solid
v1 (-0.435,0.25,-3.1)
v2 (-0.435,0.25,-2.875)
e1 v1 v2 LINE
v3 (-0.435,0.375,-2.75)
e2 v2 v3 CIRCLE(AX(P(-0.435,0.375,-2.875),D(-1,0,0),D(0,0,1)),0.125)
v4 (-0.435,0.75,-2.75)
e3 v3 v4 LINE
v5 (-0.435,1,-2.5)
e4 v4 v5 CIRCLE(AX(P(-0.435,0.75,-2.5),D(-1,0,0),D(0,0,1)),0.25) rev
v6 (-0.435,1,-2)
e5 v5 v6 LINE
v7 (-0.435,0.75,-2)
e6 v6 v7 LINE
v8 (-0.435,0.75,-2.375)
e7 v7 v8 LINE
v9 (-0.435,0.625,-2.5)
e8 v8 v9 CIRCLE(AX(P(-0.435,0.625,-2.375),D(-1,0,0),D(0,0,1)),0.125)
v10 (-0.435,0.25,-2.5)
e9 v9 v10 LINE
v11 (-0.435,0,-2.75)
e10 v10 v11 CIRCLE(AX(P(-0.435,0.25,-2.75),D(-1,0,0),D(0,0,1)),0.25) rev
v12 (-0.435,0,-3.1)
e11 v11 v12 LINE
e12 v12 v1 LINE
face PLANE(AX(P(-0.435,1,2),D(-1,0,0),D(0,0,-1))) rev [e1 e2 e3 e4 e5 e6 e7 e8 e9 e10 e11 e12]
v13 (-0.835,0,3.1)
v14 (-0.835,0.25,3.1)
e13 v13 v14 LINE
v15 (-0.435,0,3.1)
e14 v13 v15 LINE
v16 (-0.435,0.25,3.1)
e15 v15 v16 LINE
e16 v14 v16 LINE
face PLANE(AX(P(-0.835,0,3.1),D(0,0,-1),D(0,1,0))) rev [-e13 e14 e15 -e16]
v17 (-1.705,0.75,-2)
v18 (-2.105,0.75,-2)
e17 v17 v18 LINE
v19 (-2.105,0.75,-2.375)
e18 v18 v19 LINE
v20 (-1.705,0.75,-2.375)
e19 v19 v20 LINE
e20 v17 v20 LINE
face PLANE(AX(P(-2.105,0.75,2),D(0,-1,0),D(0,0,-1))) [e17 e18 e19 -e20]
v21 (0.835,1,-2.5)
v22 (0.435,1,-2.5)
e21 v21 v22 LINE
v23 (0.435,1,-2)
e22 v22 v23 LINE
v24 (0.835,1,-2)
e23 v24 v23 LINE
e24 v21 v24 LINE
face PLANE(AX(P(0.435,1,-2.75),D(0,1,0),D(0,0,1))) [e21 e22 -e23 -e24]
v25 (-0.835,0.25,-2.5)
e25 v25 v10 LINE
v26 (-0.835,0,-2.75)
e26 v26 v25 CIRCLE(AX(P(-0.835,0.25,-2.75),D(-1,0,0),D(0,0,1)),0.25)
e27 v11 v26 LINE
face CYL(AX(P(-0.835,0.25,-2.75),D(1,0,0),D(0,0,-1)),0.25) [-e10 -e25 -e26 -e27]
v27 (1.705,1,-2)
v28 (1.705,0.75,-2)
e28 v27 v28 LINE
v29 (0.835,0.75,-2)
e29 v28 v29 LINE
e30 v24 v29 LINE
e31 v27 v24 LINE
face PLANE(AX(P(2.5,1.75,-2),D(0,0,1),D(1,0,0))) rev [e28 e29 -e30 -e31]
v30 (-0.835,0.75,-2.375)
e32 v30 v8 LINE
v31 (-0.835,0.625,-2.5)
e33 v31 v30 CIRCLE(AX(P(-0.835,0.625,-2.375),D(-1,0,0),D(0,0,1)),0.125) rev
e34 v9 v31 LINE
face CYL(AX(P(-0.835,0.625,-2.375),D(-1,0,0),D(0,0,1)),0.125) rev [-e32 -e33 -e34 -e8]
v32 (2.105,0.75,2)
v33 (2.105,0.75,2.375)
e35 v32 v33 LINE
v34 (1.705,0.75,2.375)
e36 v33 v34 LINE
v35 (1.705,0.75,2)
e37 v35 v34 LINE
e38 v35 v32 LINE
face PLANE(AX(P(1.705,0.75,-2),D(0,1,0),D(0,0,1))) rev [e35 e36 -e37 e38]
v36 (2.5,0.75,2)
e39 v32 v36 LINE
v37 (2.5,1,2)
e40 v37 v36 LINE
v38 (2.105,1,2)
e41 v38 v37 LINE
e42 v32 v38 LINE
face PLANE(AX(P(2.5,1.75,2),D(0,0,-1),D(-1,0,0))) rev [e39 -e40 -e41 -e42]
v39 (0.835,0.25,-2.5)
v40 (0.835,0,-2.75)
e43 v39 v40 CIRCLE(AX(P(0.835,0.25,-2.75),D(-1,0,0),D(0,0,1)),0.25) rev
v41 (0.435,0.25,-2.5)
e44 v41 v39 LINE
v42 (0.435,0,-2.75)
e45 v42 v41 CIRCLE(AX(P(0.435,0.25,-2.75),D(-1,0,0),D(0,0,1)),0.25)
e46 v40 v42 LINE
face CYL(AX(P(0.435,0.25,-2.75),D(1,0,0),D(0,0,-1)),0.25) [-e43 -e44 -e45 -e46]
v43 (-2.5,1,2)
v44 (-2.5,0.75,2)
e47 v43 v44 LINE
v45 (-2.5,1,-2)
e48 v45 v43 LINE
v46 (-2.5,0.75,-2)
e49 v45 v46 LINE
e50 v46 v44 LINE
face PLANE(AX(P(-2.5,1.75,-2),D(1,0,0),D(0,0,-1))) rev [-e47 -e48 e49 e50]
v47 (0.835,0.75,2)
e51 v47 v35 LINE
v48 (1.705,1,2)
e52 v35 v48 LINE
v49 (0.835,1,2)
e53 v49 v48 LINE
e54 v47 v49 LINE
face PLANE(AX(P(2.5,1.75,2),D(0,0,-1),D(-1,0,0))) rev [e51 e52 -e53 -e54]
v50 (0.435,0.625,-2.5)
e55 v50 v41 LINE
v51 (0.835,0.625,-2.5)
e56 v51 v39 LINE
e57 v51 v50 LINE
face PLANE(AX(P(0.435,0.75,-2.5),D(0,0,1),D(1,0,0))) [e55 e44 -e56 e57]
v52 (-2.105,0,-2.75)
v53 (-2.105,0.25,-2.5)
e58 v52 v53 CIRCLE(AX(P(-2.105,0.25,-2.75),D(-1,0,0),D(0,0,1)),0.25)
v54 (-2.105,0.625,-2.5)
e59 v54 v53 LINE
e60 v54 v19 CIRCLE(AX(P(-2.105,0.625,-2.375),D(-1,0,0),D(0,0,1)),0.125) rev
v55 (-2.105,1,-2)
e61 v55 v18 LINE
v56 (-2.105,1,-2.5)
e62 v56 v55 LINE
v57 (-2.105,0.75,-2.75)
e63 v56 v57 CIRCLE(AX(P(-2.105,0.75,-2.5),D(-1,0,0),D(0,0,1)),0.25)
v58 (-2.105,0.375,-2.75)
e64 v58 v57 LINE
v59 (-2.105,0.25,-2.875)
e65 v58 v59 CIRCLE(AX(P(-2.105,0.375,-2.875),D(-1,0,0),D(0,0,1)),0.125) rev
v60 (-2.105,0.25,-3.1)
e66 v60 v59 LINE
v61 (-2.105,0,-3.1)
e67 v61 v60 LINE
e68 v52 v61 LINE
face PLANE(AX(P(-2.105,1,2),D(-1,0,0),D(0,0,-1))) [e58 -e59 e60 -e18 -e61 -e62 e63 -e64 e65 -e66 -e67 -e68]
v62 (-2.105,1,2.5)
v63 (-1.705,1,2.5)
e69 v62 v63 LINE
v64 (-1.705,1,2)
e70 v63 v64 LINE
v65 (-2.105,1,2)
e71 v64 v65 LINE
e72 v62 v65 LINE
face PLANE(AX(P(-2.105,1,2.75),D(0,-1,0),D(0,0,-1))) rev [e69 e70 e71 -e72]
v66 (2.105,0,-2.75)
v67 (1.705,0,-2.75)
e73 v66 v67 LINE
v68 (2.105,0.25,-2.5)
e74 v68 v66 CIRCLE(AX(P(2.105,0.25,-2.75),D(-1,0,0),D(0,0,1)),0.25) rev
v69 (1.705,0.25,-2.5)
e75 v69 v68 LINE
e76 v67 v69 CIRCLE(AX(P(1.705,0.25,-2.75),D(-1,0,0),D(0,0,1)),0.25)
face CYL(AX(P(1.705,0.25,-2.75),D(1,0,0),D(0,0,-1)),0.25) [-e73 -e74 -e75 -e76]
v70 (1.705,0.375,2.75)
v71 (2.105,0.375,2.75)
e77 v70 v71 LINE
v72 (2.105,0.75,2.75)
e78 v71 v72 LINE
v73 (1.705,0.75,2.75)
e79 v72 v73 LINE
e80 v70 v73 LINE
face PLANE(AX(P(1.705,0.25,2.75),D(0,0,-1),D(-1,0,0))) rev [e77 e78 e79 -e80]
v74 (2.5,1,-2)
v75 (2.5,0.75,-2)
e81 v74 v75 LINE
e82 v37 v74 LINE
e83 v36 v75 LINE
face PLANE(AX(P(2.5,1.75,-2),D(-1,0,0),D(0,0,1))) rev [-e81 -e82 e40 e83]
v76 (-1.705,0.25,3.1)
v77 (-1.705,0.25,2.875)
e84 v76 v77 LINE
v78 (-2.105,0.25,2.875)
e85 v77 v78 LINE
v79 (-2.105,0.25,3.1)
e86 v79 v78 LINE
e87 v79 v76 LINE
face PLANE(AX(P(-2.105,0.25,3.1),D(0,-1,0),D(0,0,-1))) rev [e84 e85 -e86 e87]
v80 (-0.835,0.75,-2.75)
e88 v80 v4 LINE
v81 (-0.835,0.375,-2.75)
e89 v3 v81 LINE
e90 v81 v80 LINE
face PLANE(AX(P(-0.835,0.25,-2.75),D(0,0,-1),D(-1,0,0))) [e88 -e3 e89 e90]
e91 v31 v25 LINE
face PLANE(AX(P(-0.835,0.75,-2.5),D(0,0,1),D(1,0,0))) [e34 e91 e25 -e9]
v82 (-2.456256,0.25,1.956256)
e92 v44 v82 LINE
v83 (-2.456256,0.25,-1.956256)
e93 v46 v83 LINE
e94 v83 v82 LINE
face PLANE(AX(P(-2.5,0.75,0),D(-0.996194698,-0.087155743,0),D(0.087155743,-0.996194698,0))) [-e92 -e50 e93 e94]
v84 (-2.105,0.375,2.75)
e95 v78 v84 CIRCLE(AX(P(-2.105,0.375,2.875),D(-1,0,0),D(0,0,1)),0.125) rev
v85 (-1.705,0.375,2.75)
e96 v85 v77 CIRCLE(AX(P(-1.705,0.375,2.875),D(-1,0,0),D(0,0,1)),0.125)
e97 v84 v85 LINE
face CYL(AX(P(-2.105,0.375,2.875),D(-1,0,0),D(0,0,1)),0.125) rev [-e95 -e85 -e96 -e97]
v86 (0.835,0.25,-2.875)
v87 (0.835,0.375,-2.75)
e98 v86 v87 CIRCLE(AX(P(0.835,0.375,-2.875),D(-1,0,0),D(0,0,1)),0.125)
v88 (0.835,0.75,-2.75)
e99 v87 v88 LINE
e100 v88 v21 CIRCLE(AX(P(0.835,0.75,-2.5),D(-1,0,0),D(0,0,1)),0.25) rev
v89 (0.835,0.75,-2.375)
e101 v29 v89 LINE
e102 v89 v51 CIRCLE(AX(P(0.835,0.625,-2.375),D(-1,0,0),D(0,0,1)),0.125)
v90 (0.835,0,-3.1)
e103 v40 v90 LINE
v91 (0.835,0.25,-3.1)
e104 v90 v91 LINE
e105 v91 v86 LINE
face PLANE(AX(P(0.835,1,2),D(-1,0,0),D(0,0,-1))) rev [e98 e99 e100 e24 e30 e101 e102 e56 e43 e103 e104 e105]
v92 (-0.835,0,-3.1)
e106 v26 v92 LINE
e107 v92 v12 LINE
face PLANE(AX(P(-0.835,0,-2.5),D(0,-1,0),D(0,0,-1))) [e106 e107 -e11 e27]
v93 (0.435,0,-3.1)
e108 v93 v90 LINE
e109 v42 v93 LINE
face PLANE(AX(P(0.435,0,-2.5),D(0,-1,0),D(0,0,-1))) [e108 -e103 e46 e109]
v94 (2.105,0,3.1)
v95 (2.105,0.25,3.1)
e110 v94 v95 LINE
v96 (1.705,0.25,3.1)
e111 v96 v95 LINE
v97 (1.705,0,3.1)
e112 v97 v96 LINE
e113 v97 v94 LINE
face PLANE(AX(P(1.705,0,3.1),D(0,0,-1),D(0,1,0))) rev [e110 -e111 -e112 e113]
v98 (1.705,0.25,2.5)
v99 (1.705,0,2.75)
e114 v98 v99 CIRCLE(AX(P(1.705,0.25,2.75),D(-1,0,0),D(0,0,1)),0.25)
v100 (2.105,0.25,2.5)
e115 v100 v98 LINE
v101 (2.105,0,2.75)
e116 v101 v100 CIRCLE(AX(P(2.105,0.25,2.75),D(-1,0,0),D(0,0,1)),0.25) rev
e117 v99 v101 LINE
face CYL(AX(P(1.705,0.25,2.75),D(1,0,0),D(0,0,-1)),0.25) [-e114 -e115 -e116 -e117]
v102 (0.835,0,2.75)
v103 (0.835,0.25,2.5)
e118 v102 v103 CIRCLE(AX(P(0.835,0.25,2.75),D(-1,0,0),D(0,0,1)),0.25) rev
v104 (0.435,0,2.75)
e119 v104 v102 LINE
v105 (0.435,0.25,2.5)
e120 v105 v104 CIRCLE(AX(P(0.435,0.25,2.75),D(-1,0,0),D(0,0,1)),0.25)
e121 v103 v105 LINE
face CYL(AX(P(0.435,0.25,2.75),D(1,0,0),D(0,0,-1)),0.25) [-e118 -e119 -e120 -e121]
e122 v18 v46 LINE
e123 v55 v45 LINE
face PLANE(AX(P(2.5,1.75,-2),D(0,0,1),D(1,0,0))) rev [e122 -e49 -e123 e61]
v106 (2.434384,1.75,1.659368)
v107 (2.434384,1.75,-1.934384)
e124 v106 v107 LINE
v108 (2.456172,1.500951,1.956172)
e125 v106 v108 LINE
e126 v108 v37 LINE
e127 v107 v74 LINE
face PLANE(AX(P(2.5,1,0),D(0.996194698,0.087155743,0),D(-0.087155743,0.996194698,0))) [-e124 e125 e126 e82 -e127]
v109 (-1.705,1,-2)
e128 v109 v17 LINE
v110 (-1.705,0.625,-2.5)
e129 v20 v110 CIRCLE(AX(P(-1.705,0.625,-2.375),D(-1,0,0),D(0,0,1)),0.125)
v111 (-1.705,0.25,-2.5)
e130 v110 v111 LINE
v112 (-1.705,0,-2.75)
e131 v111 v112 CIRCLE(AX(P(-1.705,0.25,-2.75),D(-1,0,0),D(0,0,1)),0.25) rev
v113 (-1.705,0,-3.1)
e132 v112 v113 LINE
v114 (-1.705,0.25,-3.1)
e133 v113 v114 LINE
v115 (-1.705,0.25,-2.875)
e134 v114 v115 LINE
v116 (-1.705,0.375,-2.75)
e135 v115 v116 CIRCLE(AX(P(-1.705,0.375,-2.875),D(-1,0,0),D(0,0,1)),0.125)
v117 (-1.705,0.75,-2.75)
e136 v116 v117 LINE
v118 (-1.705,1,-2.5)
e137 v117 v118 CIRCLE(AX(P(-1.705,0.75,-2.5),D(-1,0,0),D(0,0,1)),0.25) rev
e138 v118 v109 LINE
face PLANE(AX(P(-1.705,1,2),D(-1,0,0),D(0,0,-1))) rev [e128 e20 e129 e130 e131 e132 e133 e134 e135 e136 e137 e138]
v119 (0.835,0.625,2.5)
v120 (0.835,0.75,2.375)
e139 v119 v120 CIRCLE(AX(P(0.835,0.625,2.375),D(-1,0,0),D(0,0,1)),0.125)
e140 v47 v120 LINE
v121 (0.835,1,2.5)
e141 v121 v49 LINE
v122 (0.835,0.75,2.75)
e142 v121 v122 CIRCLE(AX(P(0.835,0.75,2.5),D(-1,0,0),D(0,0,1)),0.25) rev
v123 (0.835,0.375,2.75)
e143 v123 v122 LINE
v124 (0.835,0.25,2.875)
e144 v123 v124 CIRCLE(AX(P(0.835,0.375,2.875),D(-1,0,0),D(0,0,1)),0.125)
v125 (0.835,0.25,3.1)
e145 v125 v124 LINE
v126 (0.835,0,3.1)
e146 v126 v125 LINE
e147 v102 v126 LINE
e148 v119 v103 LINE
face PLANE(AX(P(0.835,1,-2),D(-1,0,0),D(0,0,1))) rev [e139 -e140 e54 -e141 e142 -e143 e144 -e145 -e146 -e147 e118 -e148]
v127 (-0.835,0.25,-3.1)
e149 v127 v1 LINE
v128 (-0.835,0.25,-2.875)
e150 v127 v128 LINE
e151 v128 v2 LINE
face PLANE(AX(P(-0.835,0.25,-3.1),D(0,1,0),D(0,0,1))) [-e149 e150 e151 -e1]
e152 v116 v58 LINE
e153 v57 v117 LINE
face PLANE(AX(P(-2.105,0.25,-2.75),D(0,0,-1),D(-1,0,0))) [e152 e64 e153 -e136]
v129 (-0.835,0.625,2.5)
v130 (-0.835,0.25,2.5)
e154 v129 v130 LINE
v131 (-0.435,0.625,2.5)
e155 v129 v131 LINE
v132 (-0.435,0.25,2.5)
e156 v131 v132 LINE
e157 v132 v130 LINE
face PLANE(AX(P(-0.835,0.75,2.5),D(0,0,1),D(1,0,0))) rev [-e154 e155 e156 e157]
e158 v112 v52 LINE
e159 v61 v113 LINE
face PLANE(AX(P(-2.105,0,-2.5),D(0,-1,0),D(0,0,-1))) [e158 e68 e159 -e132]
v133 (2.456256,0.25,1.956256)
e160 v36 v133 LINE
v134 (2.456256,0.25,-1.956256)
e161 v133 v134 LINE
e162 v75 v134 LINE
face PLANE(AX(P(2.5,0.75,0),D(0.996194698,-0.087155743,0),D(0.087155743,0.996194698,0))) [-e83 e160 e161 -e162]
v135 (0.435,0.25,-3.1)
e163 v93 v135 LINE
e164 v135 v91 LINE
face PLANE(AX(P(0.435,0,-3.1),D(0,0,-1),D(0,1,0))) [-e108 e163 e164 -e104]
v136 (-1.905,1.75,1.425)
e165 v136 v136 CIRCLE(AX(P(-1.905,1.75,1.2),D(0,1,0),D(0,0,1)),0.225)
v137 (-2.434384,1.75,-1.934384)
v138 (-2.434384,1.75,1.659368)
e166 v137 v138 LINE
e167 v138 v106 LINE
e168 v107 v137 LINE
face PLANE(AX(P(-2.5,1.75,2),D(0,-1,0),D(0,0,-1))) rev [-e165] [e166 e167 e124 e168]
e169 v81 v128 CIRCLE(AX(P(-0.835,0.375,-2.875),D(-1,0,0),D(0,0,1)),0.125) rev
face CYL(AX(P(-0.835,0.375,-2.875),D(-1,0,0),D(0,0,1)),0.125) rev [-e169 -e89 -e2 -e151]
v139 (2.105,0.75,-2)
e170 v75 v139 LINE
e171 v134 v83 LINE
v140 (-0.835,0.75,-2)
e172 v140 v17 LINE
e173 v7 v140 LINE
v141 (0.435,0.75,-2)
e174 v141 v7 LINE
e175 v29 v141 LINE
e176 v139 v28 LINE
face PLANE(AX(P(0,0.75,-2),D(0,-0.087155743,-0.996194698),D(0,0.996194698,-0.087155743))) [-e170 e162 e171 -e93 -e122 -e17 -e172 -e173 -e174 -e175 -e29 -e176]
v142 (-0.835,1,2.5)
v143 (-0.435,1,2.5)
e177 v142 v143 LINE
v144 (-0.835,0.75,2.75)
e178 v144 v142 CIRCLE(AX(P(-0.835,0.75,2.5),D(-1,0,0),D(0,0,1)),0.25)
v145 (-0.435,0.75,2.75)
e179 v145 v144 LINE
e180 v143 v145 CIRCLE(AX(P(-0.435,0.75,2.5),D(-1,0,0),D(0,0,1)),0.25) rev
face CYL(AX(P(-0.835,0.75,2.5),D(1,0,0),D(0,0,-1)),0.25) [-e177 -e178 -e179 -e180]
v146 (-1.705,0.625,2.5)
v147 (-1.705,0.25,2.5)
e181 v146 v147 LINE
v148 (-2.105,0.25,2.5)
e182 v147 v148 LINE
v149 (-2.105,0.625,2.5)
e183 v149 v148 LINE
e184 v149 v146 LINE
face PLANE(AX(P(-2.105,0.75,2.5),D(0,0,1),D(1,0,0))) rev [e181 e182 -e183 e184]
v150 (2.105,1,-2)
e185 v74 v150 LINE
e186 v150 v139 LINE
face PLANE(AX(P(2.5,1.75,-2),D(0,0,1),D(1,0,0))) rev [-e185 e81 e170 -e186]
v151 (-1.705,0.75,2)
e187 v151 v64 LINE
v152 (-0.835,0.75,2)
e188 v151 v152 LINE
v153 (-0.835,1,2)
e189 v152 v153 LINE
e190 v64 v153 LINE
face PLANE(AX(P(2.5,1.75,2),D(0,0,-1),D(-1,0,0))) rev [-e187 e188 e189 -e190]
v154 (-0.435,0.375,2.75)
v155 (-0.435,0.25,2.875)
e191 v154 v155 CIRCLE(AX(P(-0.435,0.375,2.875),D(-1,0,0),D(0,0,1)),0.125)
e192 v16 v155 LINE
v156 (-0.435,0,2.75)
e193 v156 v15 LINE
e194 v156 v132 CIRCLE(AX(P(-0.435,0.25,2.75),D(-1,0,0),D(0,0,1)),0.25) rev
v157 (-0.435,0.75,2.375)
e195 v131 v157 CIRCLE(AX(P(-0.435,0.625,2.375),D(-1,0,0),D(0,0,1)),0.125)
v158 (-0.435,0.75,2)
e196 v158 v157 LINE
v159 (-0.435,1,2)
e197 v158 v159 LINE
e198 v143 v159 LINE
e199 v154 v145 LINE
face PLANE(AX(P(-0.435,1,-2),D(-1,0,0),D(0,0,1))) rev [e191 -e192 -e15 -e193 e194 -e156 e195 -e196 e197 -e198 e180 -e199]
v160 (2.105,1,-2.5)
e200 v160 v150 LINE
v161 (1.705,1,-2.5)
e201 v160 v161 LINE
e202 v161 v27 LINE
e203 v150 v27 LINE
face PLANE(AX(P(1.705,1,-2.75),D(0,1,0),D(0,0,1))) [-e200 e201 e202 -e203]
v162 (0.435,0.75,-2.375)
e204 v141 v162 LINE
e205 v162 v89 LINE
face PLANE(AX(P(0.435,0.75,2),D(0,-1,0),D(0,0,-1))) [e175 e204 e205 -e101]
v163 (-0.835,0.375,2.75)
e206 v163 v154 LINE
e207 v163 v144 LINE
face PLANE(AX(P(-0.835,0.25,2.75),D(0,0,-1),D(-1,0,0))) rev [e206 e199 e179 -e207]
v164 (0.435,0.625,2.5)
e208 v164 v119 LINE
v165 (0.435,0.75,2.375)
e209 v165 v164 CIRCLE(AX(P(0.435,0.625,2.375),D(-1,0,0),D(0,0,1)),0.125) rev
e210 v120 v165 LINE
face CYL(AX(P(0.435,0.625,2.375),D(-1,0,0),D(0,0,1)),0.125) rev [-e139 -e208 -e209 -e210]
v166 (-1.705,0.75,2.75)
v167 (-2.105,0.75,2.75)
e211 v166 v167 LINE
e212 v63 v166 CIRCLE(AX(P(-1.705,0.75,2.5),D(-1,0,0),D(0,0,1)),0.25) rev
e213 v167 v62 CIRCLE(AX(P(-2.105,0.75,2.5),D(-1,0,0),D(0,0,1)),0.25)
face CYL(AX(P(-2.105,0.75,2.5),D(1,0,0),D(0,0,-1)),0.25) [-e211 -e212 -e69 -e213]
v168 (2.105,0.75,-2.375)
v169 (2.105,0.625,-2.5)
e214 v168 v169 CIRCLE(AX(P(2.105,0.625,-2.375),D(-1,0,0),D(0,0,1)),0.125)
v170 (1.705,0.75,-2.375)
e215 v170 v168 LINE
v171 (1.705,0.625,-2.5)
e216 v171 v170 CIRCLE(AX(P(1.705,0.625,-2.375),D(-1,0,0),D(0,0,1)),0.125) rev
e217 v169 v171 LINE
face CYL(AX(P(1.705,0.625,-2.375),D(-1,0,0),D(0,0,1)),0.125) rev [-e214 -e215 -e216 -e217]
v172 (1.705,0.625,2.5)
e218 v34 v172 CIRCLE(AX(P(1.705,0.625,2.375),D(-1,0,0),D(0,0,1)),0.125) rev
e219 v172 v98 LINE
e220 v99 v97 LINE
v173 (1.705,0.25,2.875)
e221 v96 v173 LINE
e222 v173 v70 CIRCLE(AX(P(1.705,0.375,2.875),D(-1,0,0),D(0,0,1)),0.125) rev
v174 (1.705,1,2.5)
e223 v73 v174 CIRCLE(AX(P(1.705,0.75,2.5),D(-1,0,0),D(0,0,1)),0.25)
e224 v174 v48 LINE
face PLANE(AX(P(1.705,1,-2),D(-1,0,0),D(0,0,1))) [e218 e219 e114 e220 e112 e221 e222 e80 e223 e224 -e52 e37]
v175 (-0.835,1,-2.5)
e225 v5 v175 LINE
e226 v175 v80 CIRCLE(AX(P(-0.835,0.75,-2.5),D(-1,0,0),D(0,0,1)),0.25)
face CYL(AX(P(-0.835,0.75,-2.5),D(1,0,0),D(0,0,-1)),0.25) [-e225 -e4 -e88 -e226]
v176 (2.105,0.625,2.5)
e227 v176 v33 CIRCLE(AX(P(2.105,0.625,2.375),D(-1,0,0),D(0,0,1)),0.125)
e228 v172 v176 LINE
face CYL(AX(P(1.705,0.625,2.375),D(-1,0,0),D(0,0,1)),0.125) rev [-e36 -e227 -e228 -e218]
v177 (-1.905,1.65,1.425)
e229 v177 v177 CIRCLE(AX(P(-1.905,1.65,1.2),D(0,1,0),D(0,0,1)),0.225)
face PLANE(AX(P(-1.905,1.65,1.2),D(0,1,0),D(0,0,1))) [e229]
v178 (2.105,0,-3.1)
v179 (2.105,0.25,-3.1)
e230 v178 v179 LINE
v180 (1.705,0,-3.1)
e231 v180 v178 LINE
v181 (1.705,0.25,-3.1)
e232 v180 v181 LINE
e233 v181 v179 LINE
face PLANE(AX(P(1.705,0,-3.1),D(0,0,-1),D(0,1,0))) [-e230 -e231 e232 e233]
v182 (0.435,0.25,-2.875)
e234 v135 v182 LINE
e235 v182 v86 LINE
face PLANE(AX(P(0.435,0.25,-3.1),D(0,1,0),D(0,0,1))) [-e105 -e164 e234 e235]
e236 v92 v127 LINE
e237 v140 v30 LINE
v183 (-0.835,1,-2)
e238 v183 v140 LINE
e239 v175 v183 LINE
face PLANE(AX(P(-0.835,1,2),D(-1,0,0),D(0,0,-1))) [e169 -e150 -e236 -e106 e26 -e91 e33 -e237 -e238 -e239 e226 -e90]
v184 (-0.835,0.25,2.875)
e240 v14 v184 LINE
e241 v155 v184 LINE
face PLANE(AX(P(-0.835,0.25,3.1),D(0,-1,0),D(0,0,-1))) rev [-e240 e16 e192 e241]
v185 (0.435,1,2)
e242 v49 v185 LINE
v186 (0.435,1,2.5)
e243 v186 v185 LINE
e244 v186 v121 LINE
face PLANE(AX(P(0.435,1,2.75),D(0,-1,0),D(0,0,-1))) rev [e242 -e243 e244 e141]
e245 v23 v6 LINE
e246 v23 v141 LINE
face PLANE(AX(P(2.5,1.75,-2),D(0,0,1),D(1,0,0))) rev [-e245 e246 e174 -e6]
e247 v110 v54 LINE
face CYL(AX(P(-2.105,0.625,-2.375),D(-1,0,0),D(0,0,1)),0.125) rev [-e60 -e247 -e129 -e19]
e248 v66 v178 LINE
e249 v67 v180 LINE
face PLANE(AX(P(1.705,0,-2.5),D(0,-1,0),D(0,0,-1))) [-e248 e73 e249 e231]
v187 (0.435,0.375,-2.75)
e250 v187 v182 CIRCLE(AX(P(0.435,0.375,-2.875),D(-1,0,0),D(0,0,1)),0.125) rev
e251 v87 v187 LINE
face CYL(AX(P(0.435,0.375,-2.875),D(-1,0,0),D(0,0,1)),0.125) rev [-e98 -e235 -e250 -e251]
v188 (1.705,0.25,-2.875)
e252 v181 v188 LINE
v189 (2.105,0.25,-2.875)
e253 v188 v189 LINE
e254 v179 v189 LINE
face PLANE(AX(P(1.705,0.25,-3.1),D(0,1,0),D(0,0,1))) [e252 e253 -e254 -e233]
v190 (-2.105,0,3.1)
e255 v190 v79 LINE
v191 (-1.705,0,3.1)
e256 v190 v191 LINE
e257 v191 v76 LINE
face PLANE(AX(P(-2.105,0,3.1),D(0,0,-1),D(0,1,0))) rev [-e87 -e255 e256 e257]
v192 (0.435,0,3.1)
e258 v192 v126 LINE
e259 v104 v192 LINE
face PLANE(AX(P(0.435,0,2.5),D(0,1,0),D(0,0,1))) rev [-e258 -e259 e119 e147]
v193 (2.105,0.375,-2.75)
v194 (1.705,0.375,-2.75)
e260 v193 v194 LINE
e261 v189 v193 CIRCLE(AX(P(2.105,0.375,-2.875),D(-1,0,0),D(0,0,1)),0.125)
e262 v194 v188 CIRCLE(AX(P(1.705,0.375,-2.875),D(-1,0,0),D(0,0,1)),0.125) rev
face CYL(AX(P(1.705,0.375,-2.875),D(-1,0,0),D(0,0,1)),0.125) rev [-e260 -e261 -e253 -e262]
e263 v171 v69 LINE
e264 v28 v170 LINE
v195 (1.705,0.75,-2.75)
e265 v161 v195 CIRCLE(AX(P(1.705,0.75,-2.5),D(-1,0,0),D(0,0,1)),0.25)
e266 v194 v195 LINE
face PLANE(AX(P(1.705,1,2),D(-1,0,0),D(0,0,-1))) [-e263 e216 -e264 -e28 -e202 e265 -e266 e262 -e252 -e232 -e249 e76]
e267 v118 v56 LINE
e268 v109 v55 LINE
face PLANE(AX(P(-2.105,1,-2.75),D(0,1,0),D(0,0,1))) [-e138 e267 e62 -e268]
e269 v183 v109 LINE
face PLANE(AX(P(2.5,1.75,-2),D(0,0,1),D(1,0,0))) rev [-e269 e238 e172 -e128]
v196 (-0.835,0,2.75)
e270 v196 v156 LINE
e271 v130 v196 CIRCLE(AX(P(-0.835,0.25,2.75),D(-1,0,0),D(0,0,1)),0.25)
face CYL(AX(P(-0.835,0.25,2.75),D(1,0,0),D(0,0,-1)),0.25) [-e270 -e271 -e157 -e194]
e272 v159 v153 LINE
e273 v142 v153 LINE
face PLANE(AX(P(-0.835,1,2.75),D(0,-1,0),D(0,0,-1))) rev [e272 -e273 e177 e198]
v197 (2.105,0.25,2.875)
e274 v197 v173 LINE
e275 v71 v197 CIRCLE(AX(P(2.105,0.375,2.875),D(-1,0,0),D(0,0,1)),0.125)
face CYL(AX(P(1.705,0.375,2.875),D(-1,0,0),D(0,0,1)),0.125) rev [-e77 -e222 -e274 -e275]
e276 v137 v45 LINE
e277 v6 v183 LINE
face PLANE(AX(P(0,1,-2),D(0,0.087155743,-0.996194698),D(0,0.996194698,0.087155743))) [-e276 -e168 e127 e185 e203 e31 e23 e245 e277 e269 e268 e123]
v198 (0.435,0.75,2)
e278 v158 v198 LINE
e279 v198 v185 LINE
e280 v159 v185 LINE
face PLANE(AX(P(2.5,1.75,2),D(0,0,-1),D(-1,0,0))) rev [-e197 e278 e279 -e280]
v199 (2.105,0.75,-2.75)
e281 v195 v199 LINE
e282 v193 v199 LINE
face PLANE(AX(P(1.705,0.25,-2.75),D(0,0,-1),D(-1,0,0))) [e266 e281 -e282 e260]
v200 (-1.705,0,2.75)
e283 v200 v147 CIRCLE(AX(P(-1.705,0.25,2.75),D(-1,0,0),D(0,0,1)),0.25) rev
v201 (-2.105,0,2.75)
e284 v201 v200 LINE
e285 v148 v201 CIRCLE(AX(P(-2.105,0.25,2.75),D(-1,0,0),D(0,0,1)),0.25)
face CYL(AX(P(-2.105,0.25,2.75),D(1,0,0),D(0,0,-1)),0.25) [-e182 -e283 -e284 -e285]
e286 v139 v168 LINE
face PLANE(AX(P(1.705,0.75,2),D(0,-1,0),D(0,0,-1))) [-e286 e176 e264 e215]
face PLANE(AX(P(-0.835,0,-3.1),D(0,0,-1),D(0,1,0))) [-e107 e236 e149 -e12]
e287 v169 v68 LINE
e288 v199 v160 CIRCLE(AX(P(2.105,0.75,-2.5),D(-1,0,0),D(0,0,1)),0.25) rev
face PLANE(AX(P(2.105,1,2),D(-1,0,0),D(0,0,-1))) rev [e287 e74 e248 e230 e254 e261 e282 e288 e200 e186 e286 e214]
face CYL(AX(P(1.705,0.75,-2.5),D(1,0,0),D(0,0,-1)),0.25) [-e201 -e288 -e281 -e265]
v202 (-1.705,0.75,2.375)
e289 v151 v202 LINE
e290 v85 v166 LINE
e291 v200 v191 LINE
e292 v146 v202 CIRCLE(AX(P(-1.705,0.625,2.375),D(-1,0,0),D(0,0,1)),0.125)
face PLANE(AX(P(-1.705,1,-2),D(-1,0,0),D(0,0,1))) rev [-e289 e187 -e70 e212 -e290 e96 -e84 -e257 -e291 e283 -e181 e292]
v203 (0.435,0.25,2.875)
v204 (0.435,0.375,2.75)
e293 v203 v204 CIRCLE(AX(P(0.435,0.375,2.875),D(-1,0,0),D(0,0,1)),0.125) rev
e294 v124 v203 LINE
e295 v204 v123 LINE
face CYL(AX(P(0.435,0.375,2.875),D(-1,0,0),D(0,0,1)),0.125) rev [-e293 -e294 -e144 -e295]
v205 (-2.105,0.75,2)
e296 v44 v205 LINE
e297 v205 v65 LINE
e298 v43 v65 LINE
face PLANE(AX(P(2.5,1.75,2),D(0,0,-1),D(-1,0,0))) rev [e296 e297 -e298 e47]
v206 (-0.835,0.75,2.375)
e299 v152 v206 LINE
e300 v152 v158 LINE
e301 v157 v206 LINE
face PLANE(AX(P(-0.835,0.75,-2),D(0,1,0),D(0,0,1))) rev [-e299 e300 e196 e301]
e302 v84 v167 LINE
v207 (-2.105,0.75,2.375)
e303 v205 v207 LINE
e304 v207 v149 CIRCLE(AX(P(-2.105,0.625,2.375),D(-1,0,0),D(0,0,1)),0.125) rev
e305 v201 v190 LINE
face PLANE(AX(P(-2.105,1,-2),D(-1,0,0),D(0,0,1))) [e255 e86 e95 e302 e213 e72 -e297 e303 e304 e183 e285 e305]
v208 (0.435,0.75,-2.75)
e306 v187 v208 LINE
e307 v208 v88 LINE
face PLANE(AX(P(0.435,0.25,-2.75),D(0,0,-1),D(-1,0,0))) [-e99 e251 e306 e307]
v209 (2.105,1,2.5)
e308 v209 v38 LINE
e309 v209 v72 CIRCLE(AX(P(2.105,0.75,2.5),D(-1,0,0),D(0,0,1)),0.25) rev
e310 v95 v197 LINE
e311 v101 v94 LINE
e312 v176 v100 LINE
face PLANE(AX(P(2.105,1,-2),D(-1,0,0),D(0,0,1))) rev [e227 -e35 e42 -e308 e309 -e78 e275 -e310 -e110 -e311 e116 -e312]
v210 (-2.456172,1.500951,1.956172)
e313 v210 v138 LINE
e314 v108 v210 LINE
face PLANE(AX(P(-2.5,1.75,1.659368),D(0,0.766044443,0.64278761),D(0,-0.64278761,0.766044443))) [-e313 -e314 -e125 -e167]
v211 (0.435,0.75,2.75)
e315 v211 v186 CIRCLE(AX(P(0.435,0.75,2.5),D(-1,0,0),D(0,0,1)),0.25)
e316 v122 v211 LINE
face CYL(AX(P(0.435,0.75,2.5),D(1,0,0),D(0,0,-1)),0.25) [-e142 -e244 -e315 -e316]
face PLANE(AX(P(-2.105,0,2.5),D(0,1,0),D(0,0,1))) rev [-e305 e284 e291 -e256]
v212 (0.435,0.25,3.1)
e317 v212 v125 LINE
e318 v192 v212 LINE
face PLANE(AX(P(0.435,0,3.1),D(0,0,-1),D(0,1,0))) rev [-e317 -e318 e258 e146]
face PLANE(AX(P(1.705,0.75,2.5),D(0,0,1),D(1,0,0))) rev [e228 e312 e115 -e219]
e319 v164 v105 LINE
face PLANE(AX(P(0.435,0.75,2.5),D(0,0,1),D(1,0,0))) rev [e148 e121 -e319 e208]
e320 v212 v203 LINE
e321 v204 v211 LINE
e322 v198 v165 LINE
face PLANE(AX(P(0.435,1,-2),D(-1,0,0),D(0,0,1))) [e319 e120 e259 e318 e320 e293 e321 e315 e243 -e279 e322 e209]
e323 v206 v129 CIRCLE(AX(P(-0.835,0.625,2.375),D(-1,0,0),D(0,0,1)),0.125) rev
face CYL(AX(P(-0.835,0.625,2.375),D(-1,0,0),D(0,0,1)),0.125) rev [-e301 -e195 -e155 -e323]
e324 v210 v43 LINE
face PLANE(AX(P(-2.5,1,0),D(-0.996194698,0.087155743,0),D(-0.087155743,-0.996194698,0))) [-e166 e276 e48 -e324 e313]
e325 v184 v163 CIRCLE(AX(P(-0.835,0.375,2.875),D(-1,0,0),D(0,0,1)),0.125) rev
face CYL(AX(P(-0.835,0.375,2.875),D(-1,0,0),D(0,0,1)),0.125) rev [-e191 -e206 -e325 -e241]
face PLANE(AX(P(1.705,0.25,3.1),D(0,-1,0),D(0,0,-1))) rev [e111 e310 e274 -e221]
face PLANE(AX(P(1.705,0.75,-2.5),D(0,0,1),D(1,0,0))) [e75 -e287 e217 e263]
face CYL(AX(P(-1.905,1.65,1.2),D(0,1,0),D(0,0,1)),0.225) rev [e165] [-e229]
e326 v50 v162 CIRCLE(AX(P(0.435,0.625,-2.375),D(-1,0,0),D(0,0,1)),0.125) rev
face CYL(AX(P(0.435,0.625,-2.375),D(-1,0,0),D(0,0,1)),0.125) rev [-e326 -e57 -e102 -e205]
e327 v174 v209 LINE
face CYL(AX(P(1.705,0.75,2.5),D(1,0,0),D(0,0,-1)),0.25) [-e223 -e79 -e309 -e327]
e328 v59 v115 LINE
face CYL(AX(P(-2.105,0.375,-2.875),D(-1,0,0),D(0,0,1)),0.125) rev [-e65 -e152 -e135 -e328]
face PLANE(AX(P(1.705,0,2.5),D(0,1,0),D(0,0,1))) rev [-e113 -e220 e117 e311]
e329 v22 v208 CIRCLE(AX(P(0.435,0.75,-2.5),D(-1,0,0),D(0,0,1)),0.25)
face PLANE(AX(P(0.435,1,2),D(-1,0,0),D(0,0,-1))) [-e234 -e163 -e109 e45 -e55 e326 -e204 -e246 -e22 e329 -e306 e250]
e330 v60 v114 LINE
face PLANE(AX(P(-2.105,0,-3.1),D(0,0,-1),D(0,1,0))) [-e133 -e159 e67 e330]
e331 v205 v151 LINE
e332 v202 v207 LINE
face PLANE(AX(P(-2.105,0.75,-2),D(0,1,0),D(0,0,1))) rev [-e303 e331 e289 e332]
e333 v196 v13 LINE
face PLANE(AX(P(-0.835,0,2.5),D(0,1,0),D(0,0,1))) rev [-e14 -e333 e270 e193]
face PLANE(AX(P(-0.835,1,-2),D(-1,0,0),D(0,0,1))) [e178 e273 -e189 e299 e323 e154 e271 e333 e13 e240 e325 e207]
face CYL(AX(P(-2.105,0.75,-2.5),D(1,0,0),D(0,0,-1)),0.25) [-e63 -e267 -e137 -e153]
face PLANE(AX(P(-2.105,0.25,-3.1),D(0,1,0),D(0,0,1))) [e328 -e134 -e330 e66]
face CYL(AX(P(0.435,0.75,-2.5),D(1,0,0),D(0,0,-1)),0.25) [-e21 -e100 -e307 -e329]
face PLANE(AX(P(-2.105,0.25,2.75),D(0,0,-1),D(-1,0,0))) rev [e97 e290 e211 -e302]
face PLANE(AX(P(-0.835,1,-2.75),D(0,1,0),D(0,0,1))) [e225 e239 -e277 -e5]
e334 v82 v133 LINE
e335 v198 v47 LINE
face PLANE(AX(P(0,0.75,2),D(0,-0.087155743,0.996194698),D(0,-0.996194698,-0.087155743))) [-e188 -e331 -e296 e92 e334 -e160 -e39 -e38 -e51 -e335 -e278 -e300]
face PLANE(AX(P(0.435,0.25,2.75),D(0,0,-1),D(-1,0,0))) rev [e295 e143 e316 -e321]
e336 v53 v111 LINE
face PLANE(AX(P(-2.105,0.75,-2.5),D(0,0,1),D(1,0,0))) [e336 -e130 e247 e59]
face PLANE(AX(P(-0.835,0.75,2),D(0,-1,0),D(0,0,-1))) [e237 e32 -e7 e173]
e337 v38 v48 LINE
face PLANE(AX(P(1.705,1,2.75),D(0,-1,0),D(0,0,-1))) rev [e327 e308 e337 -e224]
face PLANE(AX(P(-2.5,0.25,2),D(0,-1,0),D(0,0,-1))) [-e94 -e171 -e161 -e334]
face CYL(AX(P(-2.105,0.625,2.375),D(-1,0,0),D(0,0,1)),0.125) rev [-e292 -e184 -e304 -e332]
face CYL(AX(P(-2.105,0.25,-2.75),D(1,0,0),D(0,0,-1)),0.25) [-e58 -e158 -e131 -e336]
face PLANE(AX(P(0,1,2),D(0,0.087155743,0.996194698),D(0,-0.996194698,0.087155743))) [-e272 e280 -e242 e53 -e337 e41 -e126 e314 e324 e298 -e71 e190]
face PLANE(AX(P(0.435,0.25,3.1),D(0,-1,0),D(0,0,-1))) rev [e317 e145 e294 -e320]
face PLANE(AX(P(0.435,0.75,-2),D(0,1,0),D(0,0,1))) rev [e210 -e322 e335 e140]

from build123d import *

# Parameters (mm, degrees)
SKETCH2_W            = 5
SKETCH2_H            = 4
PACKAGE_DEPTH        = 1.5
DRAFT1_START         = -2.5
DRAFT1_DEPTH         = 5
DRAFT1_START_2       = -3
DRAFT1_2_DEPTH       = 6
DRAFT2_START         = -2
DRAFT2_DEPTH         = 4
DRAFT2_START_2       = -3
DRAFT2_2_DEPTH       = 6
CHAMFER1_SIZE        = 0.25
CHAMFER1_SIZE2       = 0.275015717
LEADS_DEPTH          = 0.2
FILLET1_R            = 0.25
FILLET2_R            = 0.125
FILLET1_OF_MIRROR1_R = 0.25
FILLET2_OF_MIRROR1_R = 0.125
LPATTERN1_START      = -0.835
LPATTERN1_DEPTH      = 0.4
LPATTERN1_START_2    = 0.435
LPATTERN1_2_DEPTH    = 0.4
LPATTERN1_START_3    = 1.705
LPATTERN1_3_DEPTH    = 0.4
SKETCH4_R            = 0.225
MARKER_DEPTH         = 0.1


with BuildPart() as part:
    # Sketch2 → Package (new body)
    with BuildSketch(Plane(origin=(0, 0.25, 0), x_dir=(-1, 0, 0), z_dir=(0, 1, 0))):
        Rectangle(SKETCH2_W, SKETCH2_H)
    extrude(amount=PACKAGE_DEPTH)

    # Draft1: read off the stored shape, not the designer's step
    # Draft1 outline → Draft1 (cut)
    with BuildSketch(Plane.YZ.offset(DRAFT1_START)):
        Polygon((1.75, -2), (1.75, -1.934383502), (1, -2), align=None)
        Polygon((1, 2), (1.75, 1.934383502), (1.75, 2), align=None)
    extrude(amount=DRAFT1_DEPTH, mode=Mode.SUBTRACT)

    # Draft1 2 outline → Draft1 2 (cut)
    with BuildSketch(Plane.XY.offset(DRAFT1_START_2)):
        Polygon((-2.5, 1), (-2.434383502, 1.75), (-2.5, 1.75), align=None)
        Polygon((2.434383502, 1.75), (2.5, 1), (2.5, 1.75), align=None)
    extrude(amount=DRAFT1_2_DEPTH, mode=Mode.SUBTRACT)

    # Draft2: read off the stored shape, not the designer's step
    # Draft2 outline → Draft2 (cut)
    with BuildSketch(Plane.XY.offset(DRAFT2_START)):
        Polygon((2.5, 0.75), (2.456255668, 0.25), (2.5, 0.25), align=None)
        Polygon((-2.456255668, 0.25), (-2.5, 0.75), (-2.5, 0.25), align=None)
    extrude(amount=DRAFT2_DEPTH, mode=Mode.SUBTRACT)

    # Draft2 2 outline → Draft2 2 (cut)
    with BuildSketch(Plane.YZ.offset(DRAFT2_START_2)):
        Polygon((0.75, -2), (0.25, -1.956255668), (0.25, -2), align=None)
        Polygon((0.25, 1.956255668), (0.75, 2), (0.25, 2), align=None)
    extrude(amount=DRAFT2_2_DEPTH, mode=Mode.SUBTRACT)

    # Chamfer1
    chamfer1_edges = [part.edges().sort_by_distance(p)[0] for p in [
        (0, 1.75, 1.934383502),
    ]]
    chamfer1_side = [part.faces().sort_by_distance(p)[0] for p in [
        (0, 1.373337774, 1.967337177),
    ]]
    chamfer(chamfer1_edges, length=CHAMFER1_SIZE, length2=CHAMFER1_SIZE2, reference=chamfer1_side[0])

    # Sketch3 → Leads (add, symmetric)
    with BuildSketch(Plane.ZY.offset(1.905)):
        Polygon((-2, 1), (-2, 0.75), (2.5, 0.75), (2.5, 0), (3.1, 0), (3.1, 0.25), (2.75, 0.25), (2.75, 1), align=None)
    leads = extrude(amount=LEADS_DEPTH, both=True)

    # Fillet1
    fillet1_edges = [part.edges().sort_by_distance(p)[0] for p in [
        (-1.905, 1, 2.75),
        (-1.905, 0, 2.5),
    ]]
    fillet(fillet1_edges, radius=FILLET1_R)

    # Fillet2
    fillet2_edges = [part.edges().sort_by_distance(p)[0] for p in [
        (-1.905, 0.75, 2.5),
        (-1.905, 0.25, 2.75),
    ]]
    fillet(fillet2_edges, radius=FILLET2_R)

    # Mirror1: Leads across plane
    add(leads.mirror(Plane.XY))

    # Fillet1 of Mirror1
    fillet1_of_mirror1_edges = [part.edges().sort_by_distance(p)[0] for p in [
        (-1.905, 1, -2.75),
        (-1.905, 0, -2.5),
    ]]
    fillet(fillet1_of_mirror1_edges, radius=FILLET1_OF_MIRROR1_R)

    # Fillet2 of Mirror1
    fillet2_of_mirror1_edges = [part.edges().sort_by_distance(p)[0] for p in [
        (-1.905, 0.75, -2.5),
        (-1.905, 0.25, -2.75),
    ]]
    fillet(fillet2_of_mirror1_edges, radius=FILLET2_OF_MIRROR1_R)

    # LPattern1: read off the stored shape, not the designer's step
    # LPattern1 outline → LPattern1 (add)
    with BuildSketch(Plane.YZ.offset(LPATTERN1_START)):
        with BuildLine():
            Line((1, 2), (1, 2.5))
            ThreePointArc((1, 2.5), (0.926776695, 2.676776695), (0.75, 2.75))
            Line((0.75, 2.75), (0.375, 2.75))
            ThreePointArc((0.375, 2.75), (0.286611652, 2.786611652), (0.25, 2.875))
            Line((0.25, 2.875), (0.25, 3.1))
            Line((0.25, 3.1), (0, 3.1))
            Line((0, 3.1), (0, 2.75))
            ThreePointArc((0, 2.75), (0.073223305, 2.573223305), (0.25, 2.5))
            Line((0.25, 2.5), (0.625, 2.5))
            ThreePointArc((0.625, 2.5), (0.713388348, 2.463388348), (0.75, 2.375))
            Line((0.75, 2.375), (0.75, 2))
            Line((0.75, 2), (1, 2))
        make_face()
        with BuildLine():
            ThreePointArc((0.75, -2.75), (0.926776695, -2.676776695), (1, -2.5))
            Line((1, -2.5), (1, -2))
            Line((1, -2), (0.75, -2))
            Line((0.75, -2), (0.75, -2.375))
            ThreePointArc((0.75, -2.375), (0.713388348, -2.463388348), (0.625, -2.5))
            Line((0.625, -2.5), (0.25, -2.5))
            ThreePointArc((0.25, -2.5), (0.073223305, -2.573223305), (0, -2.75))
            Line((0, -2.75), (0, -3.1))
            Line((0, -3.1), (0.25, -3.1))
            Line((0.25, -3.1), (0.25, -2.875))
            ThreePointArc((0.25, -2.875), (0.286611652, -2.786611652), (0.375, -2.75))
            Line((0.375, -2.75), (0.75, -2.75))
        make_face()
    extrude(amount=LPATTERN1_DEPTH)

    # LPattern1 2 outline → LPattern1 2 (add)
    with BuildSketch(Plane.YZ.offset(LPATTERN1_START_2)):
        with BuildLine():
            Line((1, 2), (1, 2.5))
            ThreePointArc((1, 2.5), (0.926776695, 2.676776695), (0.75, 2.75))
            Line((0.75, 2.75), (0.375, 2.75))
            ThreePointArc((0.375, 2.75), (0.286611652, 2.786611652), (0.25, 2.875))
            Line((0.25, 2.875), (0.25, 3.1))
            Line((0.25, 3.1), (0, 3.1))
            Line((0, 3.1), (0, 2.75))
            ThreePointArc((0, 2.75), (0.073223305, 2.573223305), (0.25, 2.5))
            Line((0.25, 2.5), (0.625, 2.5))
            ThreePointArc((0.625, 2.5), (0.713388348, 2.463388348), (0.75, 2.375))
            Line((0.75, 2.375), (0.75, 2))
            Line((0.75, 2), (1, 2))
        make_face()
        with BuildLine():
            ThreePointArc((0.75, -2.75), (0.926776695, -2.676776695), (1, -2.5))
            Line((1, -2.5), (1, -2))
            Line((1, -2), (0.75, -2))
            Line((0.75, -2), (0.75, -2.375))
            ThreePointArc((0.75, -2.375), (0.713388348, -2.463388348), (0.625, -2.5))
            Line((0.625, -2.5), (0.25, -2.5))
            ThreePointArc((0.25, -2.5), (0.073223305, -2.573223305), (0, -2.75))
            Line((0, -2.75), (0, -3.1))
            Line((0, -3.1), (0.25, -3.1))
            Line((0.25, -3.1), (0.25, -2.875))
            ThreePointArc((0.25, -2.875), (0.286611652, -2.786611652), (0.375, -2.75))
            Line((0.375, -2.75), (0.75, -2.75))
        make_face()
    extrude(amount=LPATTERN1_2_DEPTH)

    # LPattern1 3 outline → LPattern1 3 (add)
    with BuildSketch(Plane.YZ.offset(LPATTERN1_START_3)):
        with BuildLine():
            Line((1, 2), (1, 2.5))
            ThreePointArc((1, 2.5), (0.926776695, 2.676776695), (0.75, 2.75))
            Line((0.75, 2.75), (0.375, 2.75))
            ThreePointArc((0.375, 2.75), (0.286611652, 2.786611652), (0.25, 2.875))
            Line((0.25, 2.875), (0.25, 3.1))
            Line((0.25, 3.1), (0, 3.1))
            Line((0, 3.1), (0, 2.75))
            ThreePointArc((0, 2.75), (0.073223305, 2.573223305), (0.25, 2.5))
            Line((0.25, 2.5), (0.625, 2.5))
            ThreePointArc((0.625, 2.5), (0.713388348, 2.463388348), (0.75, 2.375))
            Line((0.75, 2.375), (0.75, 2))
            Line((0.75, 2), (1, 2))
        make_face()
        with BuildLine():
            ThreePointArc((0.75, -2.75), (0.926776695, -2.676776695), (1, -2.5))
            Line((1, -2.5), (1, -2))
            Line((1, -2), (0.75, -2))
            Line((0.75, -2), (0.75, -2.375))
            ThreePointArc((0.75, -2.375), (0.713388348, -2.463388348), (0.625, -2.5))
            Line((0.625, -2.5), (0.25, -2.5))
            ThreePointArc((0.25, -2.5), (0.073223305, -2.573223305), (0, -2.75))
            Line((0, -2.75), (0, -3.1))
            Line((0, -3.1), (0.25, -3.1))
            Line((0.25, -3.1), (0.25, -2.875))
            ThreePointArc((0.25, -2.875), (0.286611652, -2.786611652), (0.375, -2.75))
            Line((0.375, -2.75), (0.75, -2.75))
        make_face()
    extrude(amount=LPATTERN1_3_DEPTH)

    # Sketch4 → Marker (cut)
    with BuildSketch(Plane(origin=(0, 1.75, 0), x_dir=(1, 0, 0), z_dir=(0, 1, 0))):
        with Locations(Location((-1.905, -1.2, 0), (0, 0, 270))):
            Circle(SKETCH4_R)
    extrude(amount=-MARKER_DEPTH, mode=Mode.SUBTRACT)


solid = part.part
